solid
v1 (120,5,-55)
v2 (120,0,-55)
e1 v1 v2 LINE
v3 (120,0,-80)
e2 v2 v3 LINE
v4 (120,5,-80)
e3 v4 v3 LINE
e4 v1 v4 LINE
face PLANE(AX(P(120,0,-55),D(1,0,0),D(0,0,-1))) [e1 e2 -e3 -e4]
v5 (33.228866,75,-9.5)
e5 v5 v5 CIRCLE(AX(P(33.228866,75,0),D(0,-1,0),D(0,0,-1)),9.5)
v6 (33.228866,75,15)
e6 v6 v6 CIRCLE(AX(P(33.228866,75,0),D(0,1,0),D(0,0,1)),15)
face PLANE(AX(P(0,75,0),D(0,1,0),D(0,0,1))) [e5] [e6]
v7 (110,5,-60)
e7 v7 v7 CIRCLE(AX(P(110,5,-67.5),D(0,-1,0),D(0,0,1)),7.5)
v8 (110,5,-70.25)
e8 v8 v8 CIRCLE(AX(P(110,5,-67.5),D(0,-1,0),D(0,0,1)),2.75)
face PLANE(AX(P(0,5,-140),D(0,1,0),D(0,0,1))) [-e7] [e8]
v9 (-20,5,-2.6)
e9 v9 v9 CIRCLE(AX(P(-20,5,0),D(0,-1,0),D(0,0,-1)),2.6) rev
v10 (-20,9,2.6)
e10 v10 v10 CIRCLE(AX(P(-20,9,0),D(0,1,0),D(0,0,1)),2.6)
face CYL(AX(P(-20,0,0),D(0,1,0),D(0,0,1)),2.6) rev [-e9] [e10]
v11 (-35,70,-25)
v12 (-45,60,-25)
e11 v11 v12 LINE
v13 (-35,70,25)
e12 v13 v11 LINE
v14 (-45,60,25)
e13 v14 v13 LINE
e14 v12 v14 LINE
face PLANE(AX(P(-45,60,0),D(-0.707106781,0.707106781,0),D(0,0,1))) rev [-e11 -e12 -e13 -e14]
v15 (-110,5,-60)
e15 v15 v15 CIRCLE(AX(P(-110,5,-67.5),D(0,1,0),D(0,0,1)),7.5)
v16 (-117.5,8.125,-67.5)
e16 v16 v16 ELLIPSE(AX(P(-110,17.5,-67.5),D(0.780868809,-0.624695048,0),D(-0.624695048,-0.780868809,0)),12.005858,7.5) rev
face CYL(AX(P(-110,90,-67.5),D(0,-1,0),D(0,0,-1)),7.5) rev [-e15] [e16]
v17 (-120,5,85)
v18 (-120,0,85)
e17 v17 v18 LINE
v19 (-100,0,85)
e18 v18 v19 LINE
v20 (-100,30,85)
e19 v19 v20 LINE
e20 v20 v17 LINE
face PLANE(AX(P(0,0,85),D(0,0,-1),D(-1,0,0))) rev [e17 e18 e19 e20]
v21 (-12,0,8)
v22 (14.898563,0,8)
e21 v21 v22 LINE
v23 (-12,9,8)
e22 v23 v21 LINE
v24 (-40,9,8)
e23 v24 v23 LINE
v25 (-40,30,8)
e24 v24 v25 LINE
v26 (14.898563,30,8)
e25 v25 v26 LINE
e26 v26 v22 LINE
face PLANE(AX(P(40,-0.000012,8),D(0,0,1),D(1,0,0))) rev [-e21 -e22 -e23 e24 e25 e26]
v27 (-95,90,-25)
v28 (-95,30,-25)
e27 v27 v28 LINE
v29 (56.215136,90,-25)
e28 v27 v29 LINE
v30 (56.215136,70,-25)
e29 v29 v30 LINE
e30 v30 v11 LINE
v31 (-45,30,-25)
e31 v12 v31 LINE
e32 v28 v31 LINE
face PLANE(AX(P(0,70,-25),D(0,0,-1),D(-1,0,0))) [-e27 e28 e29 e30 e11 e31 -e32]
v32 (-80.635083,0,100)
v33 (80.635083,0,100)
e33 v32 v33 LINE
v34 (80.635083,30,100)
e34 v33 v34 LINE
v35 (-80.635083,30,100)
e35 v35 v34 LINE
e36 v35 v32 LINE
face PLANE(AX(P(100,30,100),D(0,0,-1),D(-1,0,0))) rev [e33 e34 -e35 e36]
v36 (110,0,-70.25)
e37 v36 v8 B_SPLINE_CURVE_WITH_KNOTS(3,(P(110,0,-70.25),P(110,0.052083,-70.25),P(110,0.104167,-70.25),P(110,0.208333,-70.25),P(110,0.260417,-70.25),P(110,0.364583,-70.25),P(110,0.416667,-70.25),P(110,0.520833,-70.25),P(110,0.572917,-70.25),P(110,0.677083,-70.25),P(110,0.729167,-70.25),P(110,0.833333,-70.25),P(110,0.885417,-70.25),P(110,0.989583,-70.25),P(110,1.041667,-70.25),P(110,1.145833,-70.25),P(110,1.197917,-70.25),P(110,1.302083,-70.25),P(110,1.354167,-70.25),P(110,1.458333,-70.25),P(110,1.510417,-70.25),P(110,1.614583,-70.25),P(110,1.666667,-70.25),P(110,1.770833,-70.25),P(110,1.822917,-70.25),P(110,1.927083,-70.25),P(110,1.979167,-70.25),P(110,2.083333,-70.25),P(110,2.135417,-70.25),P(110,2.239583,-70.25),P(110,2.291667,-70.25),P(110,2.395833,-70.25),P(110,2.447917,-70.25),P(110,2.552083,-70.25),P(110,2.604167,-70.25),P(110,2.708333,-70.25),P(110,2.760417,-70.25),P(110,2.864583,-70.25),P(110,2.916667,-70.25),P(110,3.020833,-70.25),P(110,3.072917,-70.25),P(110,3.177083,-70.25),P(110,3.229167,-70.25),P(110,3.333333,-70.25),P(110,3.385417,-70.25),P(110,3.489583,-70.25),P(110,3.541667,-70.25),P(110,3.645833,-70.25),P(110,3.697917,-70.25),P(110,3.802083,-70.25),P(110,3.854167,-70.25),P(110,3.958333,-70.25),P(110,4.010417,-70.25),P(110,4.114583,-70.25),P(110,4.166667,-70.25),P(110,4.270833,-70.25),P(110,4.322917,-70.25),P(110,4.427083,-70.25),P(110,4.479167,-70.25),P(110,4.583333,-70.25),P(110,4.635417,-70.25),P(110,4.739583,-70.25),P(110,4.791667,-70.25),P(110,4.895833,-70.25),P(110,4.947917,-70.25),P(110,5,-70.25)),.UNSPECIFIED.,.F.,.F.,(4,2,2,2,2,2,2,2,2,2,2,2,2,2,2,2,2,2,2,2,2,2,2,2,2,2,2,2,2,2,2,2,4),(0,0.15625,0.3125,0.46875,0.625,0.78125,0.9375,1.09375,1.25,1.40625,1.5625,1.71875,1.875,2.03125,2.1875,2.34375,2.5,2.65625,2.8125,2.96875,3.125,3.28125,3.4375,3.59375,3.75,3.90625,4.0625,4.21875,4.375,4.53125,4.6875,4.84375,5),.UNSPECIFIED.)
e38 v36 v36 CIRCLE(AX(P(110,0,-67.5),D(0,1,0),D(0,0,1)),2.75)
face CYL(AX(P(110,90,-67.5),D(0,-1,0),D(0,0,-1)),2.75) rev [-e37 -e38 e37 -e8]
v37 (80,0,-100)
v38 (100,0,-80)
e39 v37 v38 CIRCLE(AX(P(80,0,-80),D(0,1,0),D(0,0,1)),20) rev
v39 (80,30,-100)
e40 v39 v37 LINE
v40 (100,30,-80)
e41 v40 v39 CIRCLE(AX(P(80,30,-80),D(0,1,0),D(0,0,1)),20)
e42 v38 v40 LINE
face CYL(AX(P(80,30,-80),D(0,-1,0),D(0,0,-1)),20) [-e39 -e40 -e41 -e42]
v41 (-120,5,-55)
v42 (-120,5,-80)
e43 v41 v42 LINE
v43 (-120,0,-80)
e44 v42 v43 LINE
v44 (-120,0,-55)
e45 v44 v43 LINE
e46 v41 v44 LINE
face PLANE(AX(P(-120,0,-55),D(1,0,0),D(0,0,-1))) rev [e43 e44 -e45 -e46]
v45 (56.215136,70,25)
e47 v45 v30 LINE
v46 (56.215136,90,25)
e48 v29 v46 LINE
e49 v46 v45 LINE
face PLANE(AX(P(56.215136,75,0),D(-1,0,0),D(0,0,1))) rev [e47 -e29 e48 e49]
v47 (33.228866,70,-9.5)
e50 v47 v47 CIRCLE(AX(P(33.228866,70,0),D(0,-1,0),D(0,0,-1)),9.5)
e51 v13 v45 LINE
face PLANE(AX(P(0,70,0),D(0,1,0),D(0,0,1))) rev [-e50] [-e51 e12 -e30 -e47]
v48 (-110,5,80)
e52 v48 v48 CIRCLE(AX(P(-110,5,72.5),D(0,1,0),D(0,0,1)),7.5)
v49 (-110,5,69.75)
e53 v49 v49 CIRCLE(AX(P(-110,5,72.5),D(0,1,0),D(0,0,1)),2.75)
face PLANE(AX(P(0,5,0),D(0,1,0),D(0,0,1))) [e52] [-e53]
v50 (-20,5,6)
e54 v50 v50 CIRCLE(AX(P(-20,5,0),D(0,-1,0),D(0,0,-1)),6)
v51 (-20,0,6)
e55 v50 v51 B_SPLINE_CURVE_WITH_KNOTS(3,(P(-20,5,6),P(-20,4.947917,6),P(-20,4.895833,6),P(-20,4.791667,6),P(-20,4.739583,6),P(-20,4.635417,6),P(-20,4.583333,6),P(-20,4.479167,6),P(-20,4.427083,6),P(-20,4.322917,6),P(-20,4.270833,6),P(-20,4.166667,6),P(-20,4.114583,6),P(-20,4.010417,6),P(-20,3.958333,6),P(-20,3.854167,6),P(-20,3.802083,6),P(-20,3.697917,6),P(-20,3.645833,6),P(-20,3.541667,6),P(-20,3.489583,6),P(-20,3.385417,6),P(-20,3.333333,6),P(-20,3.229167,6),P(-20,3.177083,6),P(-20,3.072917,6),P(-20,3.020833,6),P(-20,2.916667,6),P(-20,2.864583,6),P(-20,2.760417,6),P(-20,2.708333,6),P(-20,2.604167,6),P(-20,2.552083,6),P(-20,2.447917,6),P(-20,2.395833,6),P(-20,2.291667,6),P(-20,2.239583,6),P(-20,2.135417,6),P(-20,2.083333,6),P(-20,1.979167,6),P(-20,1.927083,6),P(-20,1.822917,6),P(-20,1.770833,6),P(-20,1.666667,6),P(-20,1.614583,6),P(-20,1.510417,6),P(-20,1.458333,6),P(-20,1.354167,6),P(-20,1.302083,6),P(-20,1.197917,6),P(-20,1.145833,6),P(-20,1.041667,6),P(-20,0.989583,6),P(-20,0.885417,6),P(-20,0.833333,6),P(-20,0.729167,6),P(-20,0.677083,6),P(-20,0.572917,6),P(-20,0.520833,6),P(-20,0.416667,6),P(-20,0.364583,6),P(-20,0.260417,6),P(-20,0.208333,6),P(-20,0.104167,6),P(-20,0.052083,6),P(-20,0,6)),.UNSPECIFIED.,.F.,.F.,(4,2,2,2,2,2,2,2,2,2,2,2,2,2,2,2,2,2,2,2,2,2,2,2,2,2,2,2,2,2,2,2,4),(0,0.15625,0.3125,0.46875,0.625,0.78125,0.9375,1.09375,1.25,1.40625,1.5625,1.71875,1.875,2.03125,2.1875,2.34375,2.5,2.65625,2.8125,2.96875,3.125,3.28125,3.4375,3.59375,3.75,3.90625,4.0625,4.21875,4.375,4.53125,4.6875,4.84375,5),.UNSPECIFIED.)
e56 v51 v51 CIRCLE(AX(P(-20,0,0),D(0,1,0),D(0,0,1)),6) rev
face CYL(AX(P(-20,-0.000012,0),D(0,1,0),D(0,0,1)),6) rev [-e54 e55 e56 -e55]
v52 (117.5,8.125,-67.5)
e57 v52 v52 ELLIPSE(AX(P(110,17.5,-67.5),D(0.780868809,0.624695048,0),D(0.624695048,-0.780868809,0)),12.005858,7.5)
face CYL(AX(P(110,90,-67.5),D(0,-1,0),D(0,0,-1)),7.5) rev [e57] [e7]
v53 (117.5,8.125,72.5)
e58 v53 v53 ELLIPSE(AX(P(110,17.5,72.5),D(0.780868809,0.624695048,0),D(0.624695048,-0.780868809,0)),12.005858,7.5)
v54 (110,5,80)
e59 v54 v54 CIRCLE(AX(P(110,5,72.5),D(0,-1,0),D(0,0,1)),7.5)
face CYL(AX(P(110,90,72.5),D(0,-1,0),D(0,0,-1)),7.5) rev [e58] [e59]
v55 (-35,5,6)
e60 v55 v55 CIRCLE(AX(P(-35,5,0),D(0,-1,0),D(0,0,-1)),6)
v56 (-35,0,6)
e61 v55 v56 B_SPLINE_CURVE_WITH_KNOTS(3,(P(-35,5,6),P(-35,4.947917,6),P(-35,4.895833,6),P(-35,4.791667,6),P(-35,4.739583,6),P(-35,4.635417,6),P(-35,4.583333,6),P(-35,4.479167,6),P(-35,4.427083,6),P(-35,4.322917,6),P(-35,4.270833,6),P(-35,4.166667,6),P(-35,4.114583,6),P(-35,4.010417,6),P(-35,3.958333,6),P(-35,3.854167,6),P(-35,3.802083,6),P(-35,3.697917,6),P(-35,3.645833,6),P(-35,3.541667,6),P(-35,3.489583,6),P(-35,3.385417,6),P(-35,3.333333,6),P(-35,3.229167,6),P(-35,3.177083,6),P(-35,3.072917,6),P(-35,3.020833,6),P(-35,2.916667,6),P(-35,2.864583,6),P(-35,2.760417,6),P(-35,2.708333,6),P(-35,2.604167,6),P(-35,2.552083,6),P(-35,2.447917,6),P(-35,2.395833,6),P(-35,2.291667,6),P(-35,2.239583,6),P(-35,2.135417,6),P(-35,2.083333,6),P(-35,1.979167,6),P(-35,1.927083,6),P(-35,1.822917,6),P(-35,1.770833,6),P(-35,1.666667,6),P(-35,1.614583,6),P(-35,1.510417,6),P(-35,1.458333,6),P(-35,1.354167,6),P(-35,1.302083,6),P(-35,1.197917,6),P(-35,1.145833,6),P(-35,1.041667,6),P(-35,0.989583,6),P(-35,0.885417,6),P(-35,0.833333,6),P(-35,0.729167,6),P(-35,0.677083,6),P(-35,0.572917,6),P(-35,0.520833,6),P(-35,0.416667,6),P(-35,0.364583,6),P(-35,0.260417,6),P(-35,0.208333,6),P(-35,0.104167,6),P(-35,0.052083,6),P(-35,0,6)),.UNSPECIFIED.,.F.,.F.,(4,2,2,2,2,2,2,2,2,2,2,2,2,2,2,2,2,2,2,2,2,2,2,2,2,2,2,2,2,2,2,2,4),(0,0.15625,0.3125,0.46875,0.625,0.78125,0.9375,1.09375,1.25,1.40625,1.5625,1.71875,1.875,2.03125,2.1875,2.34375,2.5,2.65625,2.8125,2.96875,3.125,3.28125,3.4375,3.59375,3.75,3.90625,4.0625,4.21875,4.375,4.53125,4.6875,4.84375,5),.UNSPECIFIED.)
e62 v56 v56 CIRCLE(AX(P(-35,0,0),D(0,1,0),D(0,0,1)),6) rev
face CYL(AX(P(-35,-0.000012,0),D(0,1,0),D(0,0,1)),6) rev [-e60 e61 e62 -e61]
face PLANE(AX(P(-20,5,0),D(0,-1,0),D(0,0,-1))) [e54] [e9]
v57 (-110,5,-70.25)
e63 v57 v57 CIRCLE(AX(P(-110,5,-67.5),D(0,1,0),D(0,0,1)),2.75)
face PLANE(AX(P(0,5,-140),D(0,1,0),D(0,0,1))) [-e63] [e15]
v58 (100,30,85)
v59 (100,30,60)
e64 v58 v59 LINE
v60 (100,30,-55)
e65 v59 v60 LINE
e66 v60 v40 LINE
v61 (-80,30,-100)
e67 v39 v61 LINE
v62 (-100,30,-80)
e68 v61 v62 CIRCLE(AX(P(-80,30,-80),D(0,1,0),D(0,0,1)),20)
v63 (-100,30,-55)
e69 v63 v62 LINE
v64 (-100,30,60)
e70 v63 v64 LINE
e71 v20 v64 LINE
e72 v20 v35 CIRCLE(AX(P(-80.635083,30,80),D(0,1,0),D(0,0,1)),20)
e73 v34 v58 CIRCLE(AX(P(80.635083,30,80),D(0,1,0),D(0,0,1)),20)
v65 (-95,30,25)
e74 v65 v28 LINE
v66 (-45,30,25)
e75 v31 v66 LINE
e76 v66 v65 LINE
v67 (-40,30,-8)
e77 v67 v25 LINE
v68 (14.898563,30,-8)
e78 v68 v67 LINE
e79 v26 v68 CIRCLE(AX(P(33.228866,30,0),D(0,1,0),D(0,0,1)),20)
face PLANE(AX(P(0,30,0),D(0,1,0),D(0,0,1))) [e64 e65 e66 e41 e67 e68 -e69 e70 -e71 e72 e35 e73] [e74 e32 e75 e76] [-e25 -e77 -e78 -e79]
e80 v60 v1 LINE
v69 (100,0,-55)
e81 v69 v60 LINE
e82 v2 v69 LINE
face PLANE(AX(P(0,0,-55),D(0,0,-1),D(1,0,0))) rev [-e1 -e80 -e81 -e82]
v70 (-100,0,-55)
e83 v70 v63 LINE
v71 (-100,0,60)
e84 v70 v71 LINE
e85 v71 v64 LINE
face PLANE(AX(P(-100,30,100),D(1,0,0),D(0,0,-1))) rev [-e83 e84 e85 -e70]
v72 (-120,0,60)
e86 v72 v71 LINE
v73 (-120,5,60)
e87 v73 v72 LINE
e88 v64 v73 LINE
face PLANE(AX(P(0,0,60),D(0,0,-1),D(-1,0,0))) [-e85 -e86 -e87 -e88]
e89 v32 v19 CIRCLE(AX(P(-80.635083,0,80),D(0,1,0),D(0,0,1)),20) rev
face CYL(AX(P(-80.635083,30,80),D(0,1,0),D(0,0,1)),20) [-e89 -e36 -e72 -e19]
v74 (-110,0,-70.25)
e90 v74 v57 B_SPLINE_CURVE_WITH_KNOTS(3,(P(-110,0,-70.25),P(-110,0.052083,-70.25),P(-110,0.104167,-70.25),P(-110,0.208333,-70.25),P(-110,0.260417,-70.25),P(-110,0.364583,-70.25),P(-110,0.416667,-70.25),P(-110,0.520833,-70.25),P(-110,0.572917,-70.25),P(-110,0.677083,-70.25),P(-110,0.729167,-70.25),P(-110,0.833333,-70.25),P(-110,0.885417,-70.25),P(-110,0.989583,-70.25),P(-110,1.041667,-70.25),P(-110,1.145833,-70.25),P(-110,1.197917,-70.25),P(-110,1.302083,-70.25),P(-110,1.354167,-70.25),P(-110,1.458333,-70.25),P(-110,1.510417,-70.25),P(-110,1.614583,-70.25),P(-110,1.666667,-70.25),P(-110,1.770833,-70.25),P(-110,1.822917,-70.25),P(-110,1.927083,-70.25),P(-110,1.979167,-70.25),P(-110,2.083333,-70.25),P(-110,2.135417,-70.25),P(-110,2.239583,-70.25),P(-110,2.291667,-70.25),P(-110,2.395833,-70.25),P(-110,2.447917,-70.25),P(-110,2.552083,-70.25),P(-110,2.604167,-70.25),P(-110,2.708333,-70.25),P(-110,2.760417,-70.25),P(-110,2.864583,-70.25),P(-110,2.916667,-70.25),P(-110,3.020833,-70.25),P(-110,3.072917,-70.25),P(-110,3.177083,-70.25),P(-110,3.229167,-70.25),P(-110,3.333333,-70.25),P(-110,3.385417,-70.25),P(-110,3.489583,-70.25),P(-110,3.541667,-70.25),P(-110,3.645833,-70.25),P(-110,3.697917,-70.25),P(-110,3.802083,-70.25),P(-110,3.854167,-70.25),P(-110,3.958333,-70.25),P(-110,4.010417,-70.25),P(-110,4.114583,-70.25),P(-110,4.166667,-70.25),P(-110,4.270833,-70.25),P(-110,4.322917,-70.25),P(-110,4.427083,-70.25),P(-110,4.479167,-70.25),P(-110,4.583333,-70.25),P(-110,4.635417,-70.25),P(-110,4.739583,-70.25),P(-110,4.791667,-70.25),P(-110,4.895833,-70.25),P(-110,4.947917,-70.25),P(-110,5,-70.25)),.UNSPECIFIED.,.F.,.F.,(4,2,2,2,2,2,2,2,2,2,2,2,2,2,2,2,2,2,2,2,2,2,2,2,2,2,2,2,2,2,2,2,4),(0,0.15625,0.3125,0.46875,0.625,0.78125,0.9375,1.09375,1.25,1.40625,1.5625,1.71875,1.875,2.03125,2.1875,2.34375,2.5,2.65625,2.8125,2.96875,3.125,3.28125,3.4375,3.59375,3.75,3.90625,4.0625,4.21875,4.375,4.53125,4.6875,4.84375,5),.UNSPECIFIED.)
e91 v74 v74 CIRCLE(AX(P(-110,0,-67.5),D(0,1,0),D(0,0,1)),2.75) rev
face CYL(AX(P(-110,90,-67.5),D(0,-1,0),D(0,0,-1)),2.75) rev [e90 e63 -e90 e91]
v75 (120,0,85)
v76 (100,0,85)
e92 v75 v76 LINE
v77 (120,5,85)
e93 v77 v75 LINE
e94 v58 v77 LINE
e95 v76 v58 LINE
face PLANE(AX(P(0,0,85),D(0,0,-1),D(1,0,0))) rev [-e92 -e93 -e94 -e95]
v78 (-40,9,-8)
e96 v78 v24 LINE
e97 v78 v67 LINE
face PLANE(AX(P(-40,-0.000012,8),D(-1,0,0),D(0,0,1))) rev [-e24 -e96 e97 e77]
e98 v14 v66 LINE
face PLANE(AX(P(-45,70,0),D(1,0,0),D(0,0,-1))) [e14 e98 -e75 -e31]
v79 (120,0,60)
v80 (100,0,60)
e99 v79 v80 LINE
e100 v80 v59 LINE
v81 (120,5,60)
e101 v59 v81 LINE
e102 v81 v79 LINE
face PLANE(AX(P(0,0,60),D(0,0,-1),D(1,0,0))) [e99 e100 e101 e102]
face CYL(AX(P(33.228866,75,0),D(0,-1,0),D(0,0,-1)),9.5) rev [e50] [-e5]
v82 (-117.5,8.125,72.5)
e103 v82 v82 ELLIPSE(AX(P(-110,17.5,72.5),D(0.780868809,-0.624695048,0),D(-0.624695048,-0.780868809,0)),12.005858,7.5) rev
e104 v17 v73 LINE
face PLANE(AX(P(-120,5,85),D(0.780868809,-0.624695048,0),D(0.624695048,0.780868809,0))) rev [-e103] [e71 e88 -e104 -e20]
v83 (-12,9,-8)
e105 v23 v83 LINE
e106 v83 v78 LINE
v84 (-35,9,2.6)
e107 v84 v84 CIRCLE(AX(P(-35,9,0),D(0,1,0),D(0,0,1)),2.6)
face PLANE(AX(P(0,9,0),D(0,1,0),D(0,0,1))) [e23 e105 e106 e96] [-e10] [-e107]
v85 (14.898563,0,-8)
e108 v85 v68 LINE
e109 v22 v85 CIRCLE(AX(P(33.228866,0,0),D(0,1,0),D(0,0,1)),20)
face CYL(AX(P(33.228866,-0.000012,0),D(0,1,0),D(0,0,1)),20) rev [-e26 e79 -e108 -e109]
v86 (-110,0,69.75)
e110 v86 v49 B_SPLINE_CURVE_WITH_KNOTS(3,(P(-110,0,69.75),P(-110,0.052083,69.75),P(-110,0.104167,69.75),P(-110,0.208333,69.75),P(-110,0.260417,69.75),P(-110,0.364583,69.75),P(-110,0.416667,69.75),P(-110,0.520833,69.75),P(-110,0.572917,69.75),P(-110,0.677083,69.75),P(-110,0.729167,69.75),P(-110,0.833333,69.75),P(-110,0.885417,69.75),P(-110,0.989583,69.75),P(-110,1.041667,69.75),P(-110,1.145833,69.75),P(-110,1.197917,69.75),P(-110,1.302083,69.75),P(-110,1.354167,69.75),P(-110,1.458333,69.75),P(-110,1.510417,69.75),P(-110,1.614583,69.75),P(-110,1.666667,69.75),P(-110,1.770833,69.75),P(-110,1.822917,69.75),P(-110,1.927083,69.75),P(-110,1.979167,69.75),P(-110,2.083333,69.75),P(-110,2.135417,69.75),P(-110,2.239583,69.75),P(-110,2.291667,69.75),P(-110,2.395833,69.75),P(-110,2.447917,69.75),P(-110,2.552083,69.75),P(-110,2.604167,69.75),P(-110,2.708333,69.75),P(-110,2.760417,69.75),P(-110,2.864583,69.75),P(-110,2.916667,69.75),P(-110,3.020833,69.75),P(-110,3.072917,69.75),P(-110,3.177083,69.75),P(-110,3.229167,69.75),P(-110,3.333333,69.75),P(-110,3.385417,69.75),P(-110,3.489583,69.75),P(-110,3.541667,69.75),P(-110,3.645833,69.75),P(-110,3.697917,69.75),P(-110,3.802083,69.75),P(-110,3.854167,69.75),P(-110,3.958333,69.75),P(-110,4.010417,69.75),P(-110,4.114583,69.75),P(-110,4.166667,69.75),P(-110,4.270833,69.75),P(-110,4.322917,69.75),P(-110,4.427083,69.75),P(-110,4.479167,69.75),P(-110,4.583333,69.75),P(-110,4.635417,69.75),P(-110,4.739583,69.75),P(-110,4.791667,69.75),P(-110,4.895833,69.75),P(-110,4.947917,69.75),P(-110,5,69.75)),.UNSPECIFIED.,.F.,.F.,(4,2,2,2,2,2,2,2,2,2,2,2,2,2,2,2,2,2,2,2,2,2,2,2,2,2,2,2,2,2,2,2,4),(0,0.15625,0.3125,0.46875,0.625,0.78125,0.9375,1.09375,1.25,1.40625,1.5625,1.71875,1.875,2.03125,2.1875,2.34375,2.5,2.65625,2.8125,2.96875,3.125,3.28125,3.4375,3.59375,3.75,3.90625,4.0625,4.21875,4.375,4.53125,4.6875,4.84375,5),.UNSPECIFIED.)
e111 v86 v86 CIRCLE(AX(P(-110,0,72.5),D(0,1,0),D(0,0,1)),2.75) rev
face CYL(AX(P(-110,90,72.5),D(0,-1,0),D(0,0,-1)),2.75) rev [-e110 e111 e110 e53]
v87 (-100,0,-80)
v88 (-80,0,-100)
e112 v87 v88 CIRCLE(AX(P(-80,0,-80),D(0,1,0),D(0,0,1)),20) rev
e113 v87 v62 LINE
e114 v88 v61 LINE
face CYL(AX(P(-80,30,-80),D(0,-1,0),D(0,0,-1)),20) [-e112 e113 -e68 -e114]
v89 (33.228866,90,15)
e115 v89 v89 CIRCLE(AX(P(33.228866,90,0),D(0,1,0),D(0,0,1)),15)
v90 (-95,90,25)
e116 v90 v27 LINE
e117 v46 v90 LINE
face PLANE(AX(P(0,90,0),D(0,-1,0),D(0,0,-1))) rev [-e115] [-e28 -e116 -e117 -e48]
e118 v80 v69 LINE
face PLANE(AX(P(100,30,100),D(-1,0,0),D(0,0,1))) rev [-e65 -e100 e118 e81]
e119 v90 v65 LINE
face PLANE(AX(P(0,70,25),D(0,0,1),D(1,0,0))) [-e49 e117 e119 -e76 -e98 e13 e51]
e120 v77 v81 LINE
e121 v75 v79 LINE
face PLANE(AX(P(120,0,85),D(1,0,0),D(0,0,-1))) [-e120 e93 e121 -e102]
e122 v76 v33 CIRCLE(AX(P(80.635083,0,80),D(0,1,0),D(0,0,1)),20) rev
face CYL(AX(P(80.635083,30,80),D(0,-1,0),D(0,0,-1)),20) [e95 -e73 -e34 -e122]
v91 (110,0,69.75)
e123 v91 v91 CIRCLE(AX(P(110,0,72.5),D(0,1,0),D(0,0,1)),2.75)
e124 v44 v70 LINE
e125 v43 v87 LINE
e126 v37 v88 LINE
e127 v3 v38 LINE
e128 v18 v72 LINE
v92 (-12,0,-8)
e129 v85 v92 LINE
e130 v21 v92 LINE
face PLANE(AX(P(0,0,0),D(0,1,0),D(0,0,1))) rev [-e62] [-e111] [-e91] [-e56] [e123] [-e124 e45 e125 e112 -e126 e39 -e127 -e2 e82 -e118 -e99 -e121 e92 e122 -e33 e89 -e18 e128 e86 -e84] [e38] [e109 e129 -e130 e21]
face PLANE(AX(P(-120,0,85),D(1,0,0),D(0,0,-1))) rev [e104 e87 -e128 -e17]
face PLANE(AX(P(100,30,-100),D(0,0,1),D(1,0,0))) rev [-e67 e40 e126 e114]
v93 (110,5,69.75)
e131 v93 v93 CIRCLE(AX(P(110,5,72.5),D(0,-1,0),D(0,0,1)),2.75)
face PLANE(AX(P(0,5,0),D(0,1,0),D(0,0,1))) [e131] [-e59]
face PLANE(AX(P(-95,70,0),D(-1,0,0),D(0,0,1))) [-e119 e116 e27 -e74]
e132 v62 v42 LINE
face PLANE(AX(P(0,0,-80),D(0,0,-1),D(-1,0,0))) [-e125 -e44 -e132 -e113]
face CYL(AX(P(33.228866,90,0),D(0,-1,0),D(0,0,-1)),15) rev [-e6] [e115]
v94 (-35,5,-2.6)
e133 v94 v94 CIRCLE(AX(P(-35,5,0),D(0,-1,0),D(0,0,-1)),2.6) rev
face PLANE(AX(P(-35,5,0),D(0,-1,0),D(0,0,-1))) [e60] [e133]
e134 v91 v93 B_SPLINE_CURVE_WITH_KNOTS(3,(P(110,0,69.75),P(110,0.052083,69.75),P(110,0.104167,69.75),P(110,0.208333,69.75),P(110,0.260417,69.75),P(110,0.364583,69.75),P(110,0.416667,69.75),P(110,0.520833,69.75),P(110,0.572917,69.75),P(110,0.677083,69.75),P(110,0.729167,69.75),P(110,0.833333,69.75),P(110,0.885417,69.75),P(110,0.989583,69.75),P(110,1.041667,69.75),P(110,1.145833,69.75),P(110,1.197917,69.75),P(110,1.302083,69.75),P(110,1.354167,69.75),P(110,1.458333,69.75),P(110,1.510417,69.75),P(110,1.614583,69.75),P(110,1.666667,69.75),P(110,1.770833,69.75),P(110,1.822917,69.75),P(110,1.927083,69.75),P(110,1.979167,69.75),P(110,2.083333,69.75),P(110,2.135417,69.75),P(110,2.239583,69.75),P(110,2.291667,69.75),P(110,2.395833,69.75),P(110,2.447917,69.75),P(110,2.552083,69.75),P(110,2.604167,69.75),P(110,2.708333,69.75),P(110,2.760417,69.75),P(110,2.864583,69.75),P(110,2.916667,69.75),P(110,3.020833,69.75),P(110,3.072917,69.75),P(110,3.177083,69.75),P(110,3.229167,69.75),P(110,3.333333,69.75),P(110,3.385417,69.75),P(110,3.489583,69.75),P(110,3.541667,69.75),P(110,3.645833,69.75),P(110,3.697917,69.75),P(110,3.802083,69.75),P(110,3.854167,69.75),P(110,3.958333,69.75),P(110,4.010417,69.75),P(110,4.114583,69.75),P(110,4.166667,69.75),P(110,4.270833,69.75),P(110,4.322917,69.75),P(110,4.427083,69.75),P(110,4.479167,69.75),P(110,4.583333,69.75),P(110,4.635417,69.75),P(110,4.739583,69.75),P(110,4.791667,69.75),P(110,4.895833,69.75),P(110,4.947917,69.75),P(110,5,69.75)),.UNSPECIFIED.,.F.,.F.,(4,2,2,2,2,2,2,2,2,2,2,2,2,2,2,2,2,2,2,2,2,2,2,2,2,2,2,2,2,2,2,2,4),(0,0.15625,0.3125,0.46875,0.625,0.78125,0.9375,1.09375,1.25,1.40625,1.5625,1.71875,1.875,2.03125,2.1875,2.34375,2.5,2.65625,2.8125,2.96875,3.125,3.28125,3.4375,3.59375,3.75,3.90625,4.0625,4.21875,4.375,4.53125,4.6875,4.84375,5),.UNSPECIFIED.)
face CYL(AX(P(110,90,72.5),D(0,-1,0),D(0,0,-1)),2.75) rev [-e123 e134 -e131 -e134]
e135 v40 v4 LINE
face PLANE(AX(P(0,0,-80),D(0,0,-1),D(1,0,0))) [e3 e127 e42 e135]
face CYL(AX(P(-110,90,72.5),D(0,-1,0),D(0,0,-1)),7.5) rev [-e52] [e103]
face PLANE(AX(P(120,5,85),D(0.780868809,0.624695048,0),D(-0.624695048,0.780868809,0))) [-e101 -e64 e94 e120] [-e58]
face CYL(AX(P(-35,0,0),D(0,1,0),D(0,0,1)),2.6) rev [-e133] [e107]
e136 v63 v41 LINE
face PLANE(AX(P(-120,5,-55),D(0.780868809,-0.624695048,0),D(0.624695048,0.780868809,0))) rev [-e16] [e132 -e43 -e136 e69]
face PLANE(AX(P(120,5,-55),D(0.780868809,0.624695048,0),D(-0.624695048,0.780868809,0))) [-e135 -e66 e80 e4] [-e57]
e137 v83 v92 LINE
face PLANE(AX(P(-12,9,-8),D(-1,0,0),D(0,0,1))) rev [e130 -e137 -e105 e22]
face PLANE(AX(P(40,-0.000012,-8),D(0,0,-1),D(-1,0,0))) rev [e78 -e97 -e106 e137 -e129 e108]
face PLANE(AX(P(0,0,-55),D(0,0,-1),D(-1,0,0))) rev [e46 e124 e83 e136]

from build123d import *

# Parameters (mm, degrees)
SZKIC1_W                        = 200
SZKIC1_H                        = 200
DODANIE_WYCI_GNI_CIE1_DEPTH     = 30
WYTNIJ_WYCI_GNI_CIE1_DEPTH      = 145.568322948
WYTNIJ_WYCI_GNI_CIE1_DEPTH_BACK = 145.568322948
SZKIC2_W                        = 80
SZKIC2_H                        = 16
WYTNIJ_WYCI_GNI_CIE2_DEPTH      = 145.568322948
WYTNIJ_WYCI_GNI_CIE2_DEPTH_BACK = 145.568322948
SZKIC3_R                        = 20
SZKIC4_W                        = 28
SZKIC4_H                        = 16
DODANIE_WYCI_GNI_CIE2_DEPTH     = 9
DODANIE_WYCI_GNI_CIE3_START     = 30
SZKIC5_W                        = 50
SZKIC5_H                        = 50
DODANIE_WYCI_GNI_CIE3_DEPTH     = 40
DODANIE_WYCI_GNI_CIE4_START     = 70
SZKIC6_W                        = 151.215135745
SZKIC6_H                        = 50
SZKIC6_R                        = 9.5
DODANIE_WYCI_GNI_CIE4_DEPTH     = 5
DODANIE_WYCI_GNI_CIE5_START     = 75
SZKIC7_W                        = 151.215135745
SZKIC7_H                        = 50
SZKIC7_R                        = 15
DODANIE_WYCI_GNI_CIE5_DEPTH     = 15
DODANIE_WYCI_GNI_CIE6_START     = 60
DODANIE_WYCI_GNI_CIE6_DEPTH     = 25
WYTNIJ_WYCI_GNI_CIE3_DEPTH      = 181.277563773
WYTNIJ_WYCI_GNI_CIE4_START      = 5
WYTNIJ_WYCI_GNI_CIE4_DEPTH      = 176.277563773
SZYK_LINIOWY1_OUTLINE_R         = 7.5
SZYK_LINIOWY1_OUTLINE_R_2       = 2.75
SZYK_LINIOWY1_DEPTH             = 5
SZYK_LINIOWY1_2_OUTLINE_W       = 20
SZYK_LINIOWY1_2_OUTLINE_H       = 25
SZYK_LINIOWY1_2_OUTLINE_R       = 7.5
SZYK_LINIOWY1_2_DEPTH           = 30
SZYK_START                      = -113
SZYK_LINIOWY1_3_OUTLINE_W       = 35
SZYK_LINIOWY1_3_OUTLINE_H       = 25
SZYK_LINIOWY1_3_DEPTH           = 16.172267629
ZAOKR_GLENIE1_R                 = 20
SFAZOWANIE1_SIZE                = 10
SZKIC10_R                       = 2.6
WYTNIJ_WYCI_GNI_CIE5_DEPTH      = 176.957381204
WYTNIJ_WYCI_GNI_CIE6_DEPTH      = 181.277563773
WYTNIJ_WYCI_GNI_CIE6_DEPTH_BACK = 5
SZKIC11_R                       = 6


with BuildPart() as part:
    # Szkic1 → Dodanie-wyciągnięcie1 (new body)
    with BuildSketch(Plane(origin=(0, 0, 0), x_dir=(1, 0, 0), z_dir=(0, 1, 0))):
        Rectangle(SZKIC1_W, SZKIC1_H)
    extrude(amount=DODANIE_WYCI_GNI_CIE1_DEPTH)

    # Szkic2 → Wytnij-wyciągnięcie1 (cut, two sides: drawn at the far end of the back side and taken through both)
    with BuildSketch(Plane(origin=(0, 0, 0), x_dir=(1, 0, 0), z_dir=(0, 1, 0)).offset(-WYTNIJ_WYCI_GNI_CIE1_DEPTH_BACK)):
        Rectangle(SZKIC2_W, SZKIC2_H)
    extrude(amount=WYTNIJ_WYCI_GNI_CIE1_DEPTH + WYTNIJ_WYCI_GNI_CIE1_DEPTH_BACK, mode=Mode.SUBTRACT)

    # Szkic3 → Wytnij-wyciągnięcie2 (cut, two sides: drawn at the far end of the back side and taken through both)
    with BuildSketch(Plane(origin=(0, 0, 0), x_dir=(1, 0, 0), z_dir=(0, 1, 0)).offset(-WYTNIJ_WYCI_GNI_CIE2_DEPTH_BACK)):
        with Locations((33.228865647, 0)):
            Circle(SZKIC3_R)
    extrude(amount=WYTNIJ_WYCI_GNI_CIE2_DEPTH + WYTNIJ_WYCI_GNI_CIE2_DEPTH_BACK, mode=Mode.SUBTRACT)

    # Szkic4 → Dodanie-wyciągnięcie2 (add)
    with BuildSketch(Plane(origin=(0, 0, 0), x_dir=(1, 0, 0), z_dir=(0, 1, 0))):
        with Locations((-26, 0)):
            Rectangle(SZKIC4_W, SZKIC4_H)
    extrude(amount=DODANIE_WYCI_GNI_CIE2_DEPTH)

    # Szkic5 → Dodanie-wyciągnięcie3 (add)
    with BuildSketch(Plane(origin=(0, 0, 0), x_dir=(1, 0, 0), z_dir=(0, 1, 0)).offset(DODANIE_WYCI_GNI_CIE3_START)):
        with Locations((-70, 0)):
            Rectangle(SZKIC5_W, SZKIC5_H)
    extrude(amount=DODANIE_WYCI_GNI_CIE3_DEPTH)

    # Szkic6 → Dodanie-wyciągnięcie4 (add)
    with BuildSketch(Plane(origin=(0, 0, 0), x_dir=(1, 0, 0), z_dir=(0, 1, 0)).offset(DODANIE_WYCI_GNI_CIE4_START)):
        with Locations((-19.392432127, 0)):
            Rectangle(SZKIC6_W, SZKIC6_H)
        with Locations(Location((33.228865647, 0, 0), (0, 0, 90))):
            Circle(SZKIC6_R, mode=Mode.SUBTRACT)
    extrude(amount=DODANIE_WYCI_GNI_CIE4_DEPTH)

    # Szkic7 → Dodanie-wyciągnięcie5 (add)
    with BuildSketch(Plane(origin=(0, 0, 0), x_dir=(1, 0, 0), z_dir=(0, 1, 0)).offset(DODANIE_WYCI_GNI_CIE5_START)):
        with Locations((-19.392432127, 0)):
            Rectangle(SZKIC7_W, SZKIC7_H)
        with Locations(Location((33.228865647, 0, 0), (0, 0, 270))):
            Circle(SZKIC7_R, mode=Mode.SUBTRACT)
    extrude(amount=DODANIE_WYCI_GNI_CIE5_DEPTH)

    # Szkic8 → Dodanie-wyciągnięcie6 (add)
    with BuildSketch(Plane.XY.offset(DODANIE_WYCI_GNI_CIE6_START)):
        Polygon((-100, 0), (-120, 0), (-120, 5), (-100, 30), align=None)
    dodanie_wyci_gni_cie6 = extrude(amount=DODANIE_WYCI_GNI_CIE6_DEPTH)

    # Szkic9 → Wytnij-wyciągnięcie3 (cut, symmetric)
    with BuildSketch(Plane(origin=(0, 0, 0), x_dir=(1, 0, 0), z_dir=(0, 1, 0))):
        with BuildLine():
            ThreePointArc((-107.25, -72.5), (-107.5214161, -71.308730991), (-108.282088619, -70.352610774))
            Line((-108.282088619, -70.352610774), (-111.717911381, -74.647389226))
            ThreePointArc((-111.717911381, -74.647389226), (-108.808730991, -74.9785839), (-107.25, -72.5))
        make_face()
        with BuildLine():
            Line((-111.717911381, -74.647389226), (-108.282088619, -70.352610774))
            ThreePointArc((-108.282088619, -70.352610774), (-112.147389226, -70.782088619), (-111.717911381, -74.647389226))
        make_face()
    wytnij_wyci_gni_cie3 = extrude(amount=WYTNIJ_WYCI_GNI_CIE3_DEPTH, both=True, mode=Mode.SUBTRACT)

    # Szkic9<3> → Wytnij-wyciągnięcie4 (cut, through all)
    with BuildSketch(Plane(origin=(0, 0, 0), x_dir=(1, 0, 0), z_dir=(0, 1, 0)).offset(WYTNIJ_WYCI_GNI_CIE4_START)):
        with BuildLine():
            ThreePointArc((-102.5, -72.5), (-103.240225728, -69.251084521), (-105.314787143, -66.643483929))
            Line((-105.314787143, -66.643483929), (-108.282088619, -70.352610774))
            ThreePointArc((-108.282088619, -70.352610774), (-107.5214161, -71.308730991), (-107.25, -72.5))
            ThreePointArc((-107.25, -72.5), (-108.808730991, -74.9785839), (-111.717911381, -74.647389226))
            Line((-111.717911381, -74.647389226), (-114.685212857, -78.356516071))
            ThreePointArc((-114.685212857, -78.356516071), (-106.751084521, -79.259774272), (-102.5, -72.5))
        make_face()
        with BuildLine():
            Line((-108.282088619, -70.352610774), (-105.314787143, -66.643483929))
            ThreePointArc((-105.314787143, -66.643483929), (-115.856516071, -67.814787143), (-114.685212857, -78.356516071))
            Line((-114.685212857, -78.356516071), (-111.717911381, -74.647389226))
            ThreePointArc((-111.717911381, -74.647389226), (-112.147389226, -70.782088619), (-108.282088619, -70.352610774))
        make_face()
    wytnij_wyci_gni_cie4 = extrude(amount=WYTNIJ_WYCI_GNI_CIE4_DEPTH, mode=Mode.SUBTRACT)



with BuildPart() as body_2:
    # Szyk liniowy1: read off the stored shape, not the designer's step
    # Szyk liniowy1 outline → Szyk liniowy1 (new body)
    with BuildSketch(Plane(origin=(0, 0, 0), x_dir=(1, 0, 0), z_dir=(0, 1, 0))):
        with Locations((-110, 67.5)):
            Circle(SZYK_LINIOWY1_OUTLINE_R)
        with Locations((-110, 67.5)):
            Circle(SZYK_LINIOWY1_OUTLINE_R_2, mode=Mode.SUBTRACT)
    szyk_liniowy1 = extrude(amount=SZYK_LINIOWY1_DEPTH)


with BuildPart() as part_1:
    add(part.part)

    add(body_2.part)  # Szyk liniowy1 2 merges body 2
    # Szyk liniowy1 2 outline → Szyk liniowy1 2 (add)
    with BuildSketch(Plane(origin=(0, 0, 0), x_dir=(1, 0, 0), z_dir=(0, 1, 0))):
        with Locations((-110, 67.5)):
            Rectangle(SZYK_LINIOWY1_2_OUTLINE_W, SZYK_LINIOWY1_2_OUTLINE_H)
        with Locations((-110, 67.5)):
            Circle(SZYK_LINIOWY1_2_OUTLINE_R, mode=Mode.SUBTRACT)
    szyk_liniowy1_2 = extrude(amount=SZYK_LINIOWY1_2_DEPTH)

    # Szyk liniowy1 3 outline → Szyk liniowy1 3 (cut)
    with BuildSketch(Plane(origin=(0, 0, 0), x_dir=(0.6246950475544242, 0.7808688094430304, 0), z_dir=(0.7808688094430304, -0.6246950475544242, 0)).offset(SZYK_START)):
        with Locations((-55.5, -67.5)):
            Rectangle(SZYK_LINIOWY1_3_OUTLINE_W, SZYK_LINIOWY1_3_OUTLINE_H)
    szyk_liniowy1_3 = extrude(amount=SZYK_LINIOWY1_3_DEPTH, mode=Mode.SUBTRACT)

    # Lustro1: Dodanie-wyciągnięcie6, Wytnij-wyciągnięcie3, Wytnij-wyciągnięcie4, Szyk liniowy1, Szyk liniowy1 2, Szyk liniowy1 3 across plane
    add(dodanie_wyci_gni_cie6.mirror(Plane(origin=(0, 0, 0), x_dir=(0, 0, 1), z_dir=(1, 0, 0))))
    add(wytnij_wyci_gni_cie3.mirror(Plane(origin=(0, 0, 0), x_dir=(0, 0, 1), z_dir=(1, 0, 0))), mode=Mode.SUBTRACT)
    add(wytnij_wyci_gni_cie4.mirror(Plane(origin=(0, 0, 0), x_dir=(0, 0, 1), z_dir=(1, 0, 0))), mode=Mode.SUBTRACT)
    add(szyk_liniowy1.mirror(Plane(origin=(0, 0, 0), x_dir=(0, 0, 1), z_dir=(1, 0, 0))))
    add(szyk_liniowy1_2.mirror(Plane(origin=(0, 0, 0), x_dir=(0, 0, 1), z_dir=(1, 0, 0))))
    add(szyk_liniowy1_3.mirror(Plane(origin=(0, 0, 0), x_dir=(0, 0, 1), z_dir=(1, 0, 0))), mode=Mode.SUBTRACT)

    # Zaokrąglenie1
    # the kernel refuses this fillet: 20 mm, written as the material it takes off along each edge
    with BuildSketch(Plane(origin=(-100, -48.412291828, 100), x_dir=(1, 0, 0), z_dir=(0, 1, 0))) as zaokr_glenie1_piece_1:
        with BuildLine():
            CenterArc((19.364916731, 20), ZAOKR_GLENIE1_R, 194.477512186, 75.522487814)
            Line((0, 15), (-0.387298335, 14.9))
            ThreePointArc((-0.387298335, 14.9), (-0.4, 7.5), (-0.4, 0))
            Line((-0.4, 0), (0, -0.4))
            Line((0, -0.4), (19.364916731, -0.4))
            Line((19.364916731, -0.4), (19.364916731, 0))
        make_face()
    extrude(amount=126.824583655, mode=Mode.SUBTRACT)
    with BuildSketch(Plane(origin=(-100, -50, -100), x_dir=(0, 0, 1), z_dir=(0, 1, 0)), Plane(origin=(100, -50, -100), x_dir=(-1, 0, 0), z_dir=(0, 1, 0))) as zaokr_glenie1_piece_2:
        with BuildLine():
            CenterArc((ZAOKR_GLENIE1_R, ZAOKR_GLENIE1_R), ZAOKR_GLENIE1_R, 180, 90)
            Line((0, ZAOKR_GLENIE1_R), (-ZAOKR_GLENIE1_R * 0.02, ZAOKR_GLENIE1_R))
            Line((-ZAOKR_GLENIE1_R * 0.02, ZAOKR_GLENIE1_R), (-ZAOKR_GLENIE1_R * 0.02, -ZAOKR_GLENIE1_R * 0.02))
            Line((-ZAOKR_GLENIE1_R * 0.02, -ZAOKR_GLENIE1_R * 0.02), (ZAOKR_GLENIE1_R, -ZAOKR_GLENIE1_R * 0.02))
            Line((ZAOKR_GLENIE1_R, -ZAOKR_GLENIE1_R * 0.02), (ZAOKR_GLENIE1_R, 0))
        make_face()
    extrude(amount=130, mode=Mode.SUBTRACT)
    with BuildSketch(Plane(origin=(100, -48.412291828, 100), x_dir=(-1, 0, 0), z_dir=(0, 1, 0))) as zaokr_glenie1_piece_3:
        with BuildLine():
            CenterArc((19.364916731, -20), ZAOKR_GLENIE1_R, 90, 75.522487814)
            Line((0, -15), (-0.387298335, -14.9))
            ThreePointArc((-0.387298335, -14.9), (-0.4, -7.5), (-0.4, 0))
            Line((-0.4, 0), (0, 0.4))
            Line((0, 0.4), (19.364916731, 0.4))
            Line((19.364916731, 0.4), (19.364916731, 0))
        make_face()
    extrude(amount=126.824583655, mode=Mode.SUBTRACT)

    # Sfazowanie1
    sfazowanie1_edges = [part_1.edges().sort_by_distance(p)[0] for p in [
        (-45, 70, 0),
    ]]
    chamfer(sfazowanie1_edges, length=SFAZOWANIE1_SIZE)

    # Szkic10 → Wytnij-wyciągnięcie5 (cut, through all)
    with BuildSketch(Plane(origin=(0, 9, 0), x_dir=(1, 0, 0), z_dir=(0, 1, 0))):
        with Locations(Location((-35, 0, 0), (0, 0, 270))):
            Circle(SZKIC10_R)
        with Locations(Location((-20, 0, 0), (0, 0, 270))):
            Circle(SZKIC10_R)
    extrude(amount=-WYTNIJ_WYCI_GNI_CIE5_DEPTH, mode=Mode.SUBTRACT)

    # Szkic11 → Wytnij-wyciągnięcie6 (cut, two sides: drawn at the far end of the back side and taken through both)
    with BuildSketch(Plane(origin=(0, 0, 0), x_dir=(-1, 0, 0), z_dir=(0, -1, 0)).offset(-WYTNIJ_WYCI_GNI_CIE6_DEPTH_BACK)):
        with Locations(Location((20, 0, 0), (0, 0, 270))):
            Circle(SZKIC11_R)
        with Locations(Location((35, 0, 0), (0, 0, 270))):
            Circle(SZKIC11_R)
    extrude(amount=WYTNIJ_WYCI_GNI_CIE6_DEPTH + WYTNIJ_WYCI_GNI_CIE6_DEPTH_BACK, mode=Mode.SUBTRACT)


solid = part_1.part
